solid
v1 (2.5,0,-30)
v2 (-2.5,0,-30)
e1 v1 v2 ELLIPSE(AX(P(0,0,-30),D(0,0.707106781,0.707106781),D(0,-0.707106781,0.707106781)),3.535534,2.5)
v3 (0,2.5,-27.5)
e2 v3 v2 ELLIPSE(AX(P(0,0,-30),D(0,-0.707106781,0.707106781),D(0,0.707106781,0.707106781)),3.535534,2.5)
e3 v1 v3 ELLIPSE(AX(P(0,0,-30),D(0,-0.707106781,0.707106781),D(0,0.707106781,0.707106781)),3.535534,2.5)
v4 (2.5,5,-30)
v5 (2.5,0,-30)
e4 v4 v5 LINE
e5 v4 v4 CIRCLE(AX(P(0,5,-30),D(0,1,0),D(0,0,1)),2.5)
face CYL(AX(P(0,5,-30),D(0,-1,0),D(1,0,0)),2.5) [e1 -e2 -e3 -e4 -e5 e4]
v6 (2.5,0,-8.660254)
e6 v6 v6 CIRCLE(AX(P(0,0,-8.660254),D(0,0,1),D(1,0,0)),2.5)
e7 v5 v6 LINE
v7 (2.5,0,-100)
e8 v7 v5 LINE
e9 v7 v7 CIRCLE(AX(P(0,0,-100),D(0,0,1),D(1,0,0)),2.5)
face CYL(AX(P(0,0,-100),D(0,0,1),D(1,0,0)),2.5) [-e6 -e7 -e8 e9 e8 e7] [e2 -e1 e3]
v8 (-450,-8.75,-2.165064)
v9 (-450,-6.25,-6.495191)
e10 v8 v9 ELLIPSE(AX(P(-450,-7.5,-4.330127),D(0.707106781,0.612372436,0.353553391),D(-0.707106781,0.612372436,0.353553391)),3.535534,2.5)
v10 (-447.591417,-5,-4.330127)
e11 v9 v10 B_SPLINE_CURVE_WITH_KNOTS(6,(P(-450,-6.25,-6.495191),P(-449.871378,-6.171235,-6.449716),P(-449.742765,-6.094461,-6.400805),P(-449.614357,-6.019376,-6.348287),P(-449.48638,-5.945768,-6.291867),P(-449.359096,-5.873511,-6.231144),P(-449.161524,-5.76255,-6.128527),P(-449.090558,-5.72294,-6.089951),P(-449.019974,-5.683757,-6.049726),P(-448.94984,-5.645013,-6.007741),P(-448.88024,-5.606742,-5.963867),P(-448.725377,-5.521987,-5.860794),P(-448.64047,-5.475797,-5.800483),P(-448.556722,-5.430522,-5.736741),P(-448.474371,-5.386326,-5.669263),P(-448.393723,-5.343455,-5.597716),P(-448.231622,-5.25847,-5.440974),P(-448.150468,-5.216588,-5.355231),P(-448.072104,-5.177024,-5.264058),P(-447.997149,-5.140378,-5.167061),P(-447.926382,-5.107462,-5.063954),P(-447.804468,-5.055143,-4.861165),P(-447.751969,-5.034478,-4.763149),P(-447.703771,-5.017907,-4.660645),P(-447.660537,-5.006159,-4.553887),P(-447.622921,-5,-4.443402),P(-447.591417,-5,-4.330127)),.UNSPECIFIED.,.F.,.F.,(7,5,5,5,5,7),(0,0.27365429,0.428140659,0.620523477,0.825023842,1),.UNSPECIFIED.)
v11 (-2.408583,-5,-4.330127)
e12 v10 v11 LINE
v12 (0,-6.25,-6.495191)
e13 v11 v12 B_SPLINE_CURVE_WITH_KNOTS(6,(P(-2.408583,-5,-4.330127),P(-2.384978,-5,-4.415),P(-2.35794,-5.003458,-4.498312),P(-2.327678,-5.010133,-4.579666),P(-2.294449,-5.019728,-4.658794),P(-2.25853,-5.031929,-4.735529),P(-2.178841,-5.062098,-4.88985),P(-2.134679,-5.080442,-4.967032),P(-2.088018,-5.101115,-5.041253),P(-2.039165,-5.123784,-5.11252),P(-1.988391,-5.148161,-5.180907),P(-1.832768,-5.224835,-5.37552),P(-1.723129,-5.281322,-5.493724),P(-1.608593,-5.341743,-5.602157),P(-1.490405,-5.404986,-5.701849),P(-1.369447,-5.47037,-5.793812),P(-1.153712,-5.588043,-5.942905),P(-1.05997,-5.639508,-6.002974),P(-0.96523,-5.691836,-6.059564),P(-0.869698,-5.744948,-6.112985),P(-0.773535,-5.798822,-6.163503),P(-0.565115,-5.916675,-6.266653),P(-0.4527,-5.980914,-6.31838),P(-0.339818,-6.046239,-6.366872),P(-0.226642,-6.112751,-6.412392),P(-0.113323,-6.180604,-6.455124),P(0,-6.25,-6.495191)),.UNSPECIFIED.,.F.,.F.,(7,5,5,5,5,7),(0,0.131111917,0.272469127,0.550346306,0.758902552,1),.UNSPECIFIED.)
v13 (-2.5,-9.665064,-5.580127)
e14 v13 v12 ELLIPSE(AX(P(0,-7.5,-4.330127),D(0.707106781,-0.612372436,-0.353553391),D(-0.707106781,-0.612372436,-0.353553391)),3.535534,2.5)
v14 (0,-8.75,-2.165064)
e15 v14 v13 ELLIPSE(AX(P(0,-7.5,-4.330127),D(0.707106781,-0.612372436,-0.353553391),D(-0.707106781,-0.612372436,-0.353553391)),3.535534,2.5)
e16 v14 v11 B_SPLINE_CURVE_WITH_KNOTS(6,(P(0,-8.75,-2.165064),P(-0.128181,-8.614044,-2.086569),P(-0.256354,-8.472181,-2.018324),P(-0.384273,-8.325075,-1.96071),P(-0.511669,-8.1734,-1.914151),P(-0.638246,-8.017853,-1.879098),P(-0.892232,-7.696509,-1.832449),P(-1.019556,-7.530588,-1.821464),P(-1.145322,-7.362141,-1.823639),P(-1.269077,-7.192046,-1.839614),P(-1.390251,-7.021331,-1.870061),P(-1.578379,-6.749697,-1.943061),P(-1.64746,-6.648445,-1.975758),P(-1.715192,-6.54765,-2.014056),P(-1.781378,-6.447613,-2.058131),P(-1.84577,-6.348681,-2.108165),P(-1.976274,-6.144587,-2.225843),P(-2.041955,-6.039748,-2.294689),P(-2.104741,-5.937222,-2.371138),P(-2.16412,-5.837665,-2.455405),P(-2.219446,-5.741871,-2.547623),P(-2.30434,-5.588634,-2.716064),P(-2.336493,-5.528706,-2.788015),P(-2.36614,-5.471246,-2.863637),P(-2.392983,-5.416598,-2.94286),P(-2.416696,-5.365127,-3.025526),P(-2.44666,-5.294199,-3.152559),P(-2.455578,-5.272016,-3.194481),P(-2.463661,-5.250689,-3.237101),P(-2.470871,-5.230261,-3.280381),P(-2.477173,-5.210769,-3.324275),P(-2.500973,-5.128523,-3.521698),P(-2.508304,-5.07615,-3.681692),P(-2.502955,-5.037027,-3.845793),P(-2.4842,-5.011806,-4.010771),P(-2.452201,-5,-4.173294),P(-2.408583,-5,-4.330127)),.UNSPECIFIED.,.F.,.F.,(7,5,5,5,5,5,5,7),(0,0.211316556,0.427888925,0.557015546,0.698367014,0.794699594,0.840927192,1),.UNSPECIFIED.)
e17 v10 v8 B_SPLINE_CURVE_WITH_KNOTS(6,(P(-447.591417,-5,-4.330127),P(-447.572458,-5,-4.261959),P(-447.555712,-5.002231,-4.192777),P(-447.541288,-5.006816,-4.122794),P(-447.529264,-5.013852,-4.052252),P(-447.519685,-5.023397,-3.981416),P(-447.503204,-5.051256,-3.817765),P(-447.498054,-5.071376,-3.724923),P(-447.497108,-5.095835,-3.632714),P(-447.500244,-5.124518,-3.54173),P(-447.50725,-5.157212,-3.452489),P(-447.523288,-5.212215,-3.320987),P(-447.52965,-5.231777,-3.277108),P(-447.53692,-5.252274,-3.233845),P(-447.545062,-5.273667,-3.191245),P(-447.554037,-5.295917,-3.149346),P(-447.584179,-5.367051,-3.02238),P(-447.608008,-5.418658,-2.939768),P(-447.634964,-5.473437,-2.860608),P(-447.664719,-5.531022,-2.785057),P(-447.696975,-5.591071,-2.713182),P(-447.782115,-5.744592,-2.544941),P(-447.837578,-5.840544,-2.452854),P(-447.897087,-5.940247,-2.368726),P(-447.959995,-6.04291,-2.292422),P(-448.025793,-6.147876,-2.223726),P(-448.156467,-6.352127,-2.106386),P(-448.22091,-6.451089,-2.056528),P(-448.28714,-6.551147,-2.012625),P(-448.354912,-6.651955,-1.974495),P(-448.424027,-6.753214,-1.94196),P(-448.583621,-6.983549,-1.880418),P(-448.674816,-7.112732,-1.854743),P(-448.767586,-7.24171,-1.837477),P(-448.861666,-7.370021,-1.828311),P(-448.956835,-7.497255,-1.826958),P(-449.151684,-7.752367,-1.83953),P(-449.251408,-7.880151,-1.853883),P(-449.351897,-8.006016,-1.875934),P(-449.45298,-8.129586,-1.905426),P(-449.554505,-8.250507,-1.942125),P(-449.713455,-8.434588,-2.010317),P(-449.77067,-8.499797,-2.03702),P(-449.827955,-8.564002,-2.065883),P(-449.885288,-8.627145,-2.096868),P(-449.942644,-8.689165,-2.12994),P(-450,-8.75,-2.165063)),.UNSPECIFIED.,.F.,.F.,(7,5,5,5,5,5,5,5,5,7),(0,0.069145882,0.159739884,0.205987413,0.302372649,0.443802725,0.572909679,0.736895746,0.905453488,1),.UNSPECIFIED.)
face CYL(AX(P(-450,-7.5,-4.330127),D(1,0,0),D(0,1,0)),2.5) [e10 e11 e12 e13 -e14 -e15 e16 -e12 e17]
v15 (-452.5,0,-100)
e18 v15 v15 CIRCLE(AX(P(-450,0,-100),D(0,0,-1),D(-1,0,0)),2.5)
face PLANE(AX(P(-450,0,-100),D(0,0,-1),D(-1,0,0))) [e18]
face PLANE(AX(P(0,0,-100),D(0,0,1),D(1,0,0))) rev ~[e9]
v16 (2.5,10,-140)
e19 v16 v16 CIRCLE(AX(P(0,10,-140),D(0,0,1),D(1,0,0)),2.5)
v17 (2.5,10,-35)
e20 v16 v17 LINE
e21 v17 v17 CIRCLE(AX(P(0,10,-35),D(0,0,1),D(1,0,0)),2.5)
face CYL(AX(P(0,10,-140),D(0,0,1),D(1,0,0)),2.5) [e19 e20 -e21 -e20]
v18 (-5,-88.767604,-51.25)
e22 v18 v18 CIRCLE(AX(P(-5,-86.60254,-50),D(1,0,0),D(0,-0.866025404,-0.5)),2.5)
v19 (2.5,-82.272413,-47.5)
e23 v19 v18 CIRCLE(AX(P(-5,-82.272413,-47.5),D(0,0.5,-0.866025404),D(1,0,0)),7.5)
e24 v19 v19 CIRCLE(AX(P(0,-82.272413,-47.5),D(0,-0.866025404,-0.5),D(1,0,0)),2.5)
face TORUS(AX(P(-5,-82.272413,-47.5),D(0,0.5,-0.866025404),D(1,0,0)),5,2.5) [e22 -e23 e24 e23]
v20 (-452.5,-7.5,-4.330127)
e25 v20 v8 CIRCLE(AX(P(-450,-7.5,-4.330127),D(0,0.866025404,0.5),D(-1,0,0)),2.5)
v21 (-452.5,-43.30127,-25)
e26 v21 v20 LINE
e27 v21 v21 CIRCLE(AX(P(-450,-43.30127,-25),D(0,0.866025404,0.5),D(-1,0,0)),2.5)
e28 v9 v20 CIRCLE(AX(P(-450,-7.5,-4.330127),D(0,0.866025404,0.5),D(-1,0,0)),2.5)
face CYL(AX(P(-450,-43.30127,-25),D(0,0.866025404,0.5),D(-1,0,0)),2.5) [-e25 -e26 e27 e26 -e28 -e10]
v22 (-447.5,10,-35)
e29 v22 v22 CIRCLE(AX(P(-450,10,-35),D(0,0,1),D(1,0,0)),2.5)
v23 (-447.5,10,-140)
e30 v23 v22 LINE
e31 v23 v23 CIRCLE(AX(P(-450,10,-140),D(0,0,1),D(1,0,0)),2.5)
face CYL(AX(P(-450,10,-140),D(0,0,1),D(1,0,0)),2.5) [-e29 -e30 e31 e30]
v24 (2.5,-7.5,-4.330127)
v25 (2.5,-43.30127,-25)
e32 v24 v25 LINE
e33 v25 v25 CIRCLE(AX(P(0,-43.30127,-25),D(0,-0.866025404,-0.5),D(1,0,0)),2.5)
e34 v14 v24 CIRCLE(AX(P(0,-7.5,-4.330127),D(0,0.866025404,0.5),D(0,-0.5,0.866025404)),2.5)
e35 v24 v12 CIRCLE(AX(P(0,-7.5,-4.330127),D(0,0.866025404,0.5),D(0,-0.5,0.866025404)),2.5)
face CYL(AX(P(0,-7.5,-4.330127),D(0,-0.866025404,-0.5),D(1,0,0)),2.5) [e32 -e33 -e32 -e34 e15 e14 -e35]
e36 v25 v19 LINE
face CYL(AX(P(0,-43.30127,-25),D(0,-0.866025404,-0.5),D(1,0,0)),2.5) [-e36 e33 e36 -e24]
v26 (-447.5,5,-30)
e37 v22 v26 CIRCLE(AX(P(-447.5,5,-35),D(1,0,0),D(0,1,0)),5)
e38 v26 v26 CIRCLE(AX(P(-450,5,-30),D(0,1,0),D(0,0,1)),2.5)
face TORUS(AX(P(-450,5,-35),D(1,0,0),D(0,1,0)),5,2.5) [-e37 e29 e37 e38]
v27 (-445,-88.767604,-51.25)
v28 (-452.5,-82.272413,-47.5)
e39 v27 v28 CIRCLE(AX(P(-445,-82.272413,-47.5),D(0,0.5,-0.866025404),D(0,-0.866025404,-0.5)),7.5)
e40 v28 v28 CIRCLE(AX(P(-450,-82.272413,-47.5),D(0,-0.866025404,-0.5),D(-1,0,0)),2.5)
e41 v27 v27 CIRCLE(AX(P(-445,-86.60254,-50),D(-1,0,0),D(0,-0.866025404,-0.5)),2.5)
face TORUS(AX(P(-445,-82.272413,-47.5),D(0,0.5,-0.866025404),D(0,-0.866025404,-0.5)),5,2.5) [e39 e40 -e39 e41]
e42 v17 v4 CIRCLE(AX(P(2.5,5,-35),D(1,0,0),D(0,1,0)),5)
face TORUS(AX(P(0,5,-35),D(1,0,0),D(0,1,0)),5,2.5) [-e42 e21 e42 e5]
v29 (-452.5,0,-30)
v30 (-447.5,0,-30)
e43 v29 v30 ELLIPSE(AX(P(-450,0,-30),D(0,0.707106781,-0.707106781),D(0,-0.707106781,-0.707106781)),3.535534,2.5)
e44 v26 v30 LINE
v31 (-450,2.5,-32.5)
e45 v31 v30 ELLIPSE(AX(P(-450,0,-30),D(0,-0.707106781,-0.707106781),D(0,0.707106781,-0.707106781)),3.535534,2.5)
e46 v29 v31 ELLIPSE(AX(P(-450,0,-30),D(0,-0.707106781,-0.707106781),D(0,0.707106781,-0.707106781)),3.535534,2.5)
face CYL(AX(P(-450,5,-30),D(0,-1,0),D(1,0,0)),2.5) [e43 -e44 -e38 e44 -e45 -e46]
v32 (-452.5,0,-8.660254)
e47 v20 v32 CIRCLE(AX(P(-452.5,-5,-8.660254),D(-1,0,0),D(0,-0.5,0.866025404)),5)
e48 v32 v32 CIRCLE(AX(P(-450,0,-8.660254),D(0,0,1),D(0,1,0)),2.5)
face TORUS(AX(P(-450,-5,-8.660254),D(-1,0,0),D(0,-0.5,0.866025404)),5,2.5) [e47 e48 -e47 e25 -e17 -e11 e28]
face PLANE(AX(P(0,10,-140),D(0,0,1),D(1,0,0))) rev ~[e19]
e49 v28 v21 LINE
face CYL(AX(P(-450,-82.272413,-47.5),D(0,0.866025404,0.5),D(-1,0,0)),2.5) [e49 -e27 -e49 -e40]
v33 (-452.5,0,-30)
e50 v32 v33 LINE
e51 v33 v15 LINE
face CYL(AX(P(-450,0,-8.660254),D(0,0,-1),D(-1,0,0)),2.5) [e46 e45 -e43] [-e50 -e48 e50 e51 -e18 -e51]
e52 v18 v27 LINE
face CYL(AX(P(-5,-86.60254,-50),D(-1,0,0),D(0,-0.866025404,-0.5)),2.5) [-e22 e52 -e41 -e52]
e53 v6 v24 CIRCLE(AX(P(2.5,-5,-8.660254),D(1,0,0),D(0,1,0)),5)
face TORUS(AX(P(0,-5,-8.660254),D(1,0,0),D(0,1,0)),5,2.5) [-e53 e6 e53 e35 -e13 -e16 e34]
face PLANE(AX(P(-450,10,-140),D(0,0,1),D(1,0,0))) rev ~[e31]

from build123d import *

# Parameters (mm, degrees)
F9_R  = 2.5
F8_R  = 2.5
F14_R = 2.5
F11_R = 2.5


with BuildPart() as f12:
    # F12: sweep along a path in F3, F5, F4
    with BuildLine(Plane.YZ) as f12_path:
        Line((0, -100), (0, -8.6602540378))
        ThreePointArc((0, -8.6602540378), (-2.5, -4.3301270189), (-7.5, -4.3301270189))
        Line((-7.5, -4.3301270189), (-43.3012701892, -25))
    with BuildLine(Plane(origin=(0, 0, 0), x_dir=(1, 0, 0), z_dir=(0, -0.5, 0.8660254038))) as f12_path_2:
        Line((0, -50), (0, -95))
        ThreePointArc((0, -95), (-1.4644660941, -98.5355339059), (-5, -100))
        Line((-5, -100), (-445, -100))
        ThreePointArc((-445, -100), (-448.5355339059, -98.5355339059), (-450, -95))
        Line((-450, -95), (-450, -50))
    with BuildLine(Plane.YZ.offset(-450)) as f12_path_3:
        Line((-43.3012701892, -25), (-7.5, -4.3301270189))
        ThreePointArc((-7.5, -4.3301270189), (-2.5, -4.3301270189), (0, -8.6602540378))
        Line((0, -8.6602540378), (0, -100))
    # F9 (on plane+point) → F12 (sweep)
    with BuildSketch(Plane.XY.offset(-100)):
        Circle(F9_R)
    sweep(path=f12_path.line + f12_path_2.line + f12_path_3.line)

    # F13: sweep along a path in F3
    with BuildLine(Plane.YZ) as f13_path:
        Line((10, -140), (10, -35))
        ThreePointArc((10, -35), (8.5355339059, -31.4644660941), (5, -30))
        Line((5, -30), (0, -30))
    # F8 (on plane+point) → F13 (sweep)
    with BuildSketch(Plane.XY.offset(-140)):
        with Locations((0, 10)):
            Circle(F8_R)
    sweep(path=f13_path.line)

    # F15: sweep along a path in F4
    with BuildLine(Plane.YZ.offset(-450)) as f15_path:
        Line((10, -140), (10, -35))
        ThreePointArc((10, -35), (8.5355339059, -31.4644660941), (5, -30))
        Line((5, -30), (0, -30))
    # F14 (on plane+point) → F15 (sweep)
    with BuildSketch(Plane.XY.offset(-140)):
        with Locations((-450, 10)):
            Circle(F14_R)
    sweep(path=f15_path.line)

    # F16: sweep along a path in F5
    with BuildLine(Plane(origin=(0, 0, 0), x_dir=(1, 0, 0), z_dir=(0, -0.5, 0.8660254038))) as f16_path:
        Line((-450, -8.6602540378), (0, -8.6602540378))
    # F11 (on offset) → F16 (sweep)
    with BuildSketch(Plane.YZ.offset(-25)):
        with Locations((-7.5, -4.3301270189)):
            Circle(F11_R)
    sweep(path=f16_path.line)


solid = f12.part
